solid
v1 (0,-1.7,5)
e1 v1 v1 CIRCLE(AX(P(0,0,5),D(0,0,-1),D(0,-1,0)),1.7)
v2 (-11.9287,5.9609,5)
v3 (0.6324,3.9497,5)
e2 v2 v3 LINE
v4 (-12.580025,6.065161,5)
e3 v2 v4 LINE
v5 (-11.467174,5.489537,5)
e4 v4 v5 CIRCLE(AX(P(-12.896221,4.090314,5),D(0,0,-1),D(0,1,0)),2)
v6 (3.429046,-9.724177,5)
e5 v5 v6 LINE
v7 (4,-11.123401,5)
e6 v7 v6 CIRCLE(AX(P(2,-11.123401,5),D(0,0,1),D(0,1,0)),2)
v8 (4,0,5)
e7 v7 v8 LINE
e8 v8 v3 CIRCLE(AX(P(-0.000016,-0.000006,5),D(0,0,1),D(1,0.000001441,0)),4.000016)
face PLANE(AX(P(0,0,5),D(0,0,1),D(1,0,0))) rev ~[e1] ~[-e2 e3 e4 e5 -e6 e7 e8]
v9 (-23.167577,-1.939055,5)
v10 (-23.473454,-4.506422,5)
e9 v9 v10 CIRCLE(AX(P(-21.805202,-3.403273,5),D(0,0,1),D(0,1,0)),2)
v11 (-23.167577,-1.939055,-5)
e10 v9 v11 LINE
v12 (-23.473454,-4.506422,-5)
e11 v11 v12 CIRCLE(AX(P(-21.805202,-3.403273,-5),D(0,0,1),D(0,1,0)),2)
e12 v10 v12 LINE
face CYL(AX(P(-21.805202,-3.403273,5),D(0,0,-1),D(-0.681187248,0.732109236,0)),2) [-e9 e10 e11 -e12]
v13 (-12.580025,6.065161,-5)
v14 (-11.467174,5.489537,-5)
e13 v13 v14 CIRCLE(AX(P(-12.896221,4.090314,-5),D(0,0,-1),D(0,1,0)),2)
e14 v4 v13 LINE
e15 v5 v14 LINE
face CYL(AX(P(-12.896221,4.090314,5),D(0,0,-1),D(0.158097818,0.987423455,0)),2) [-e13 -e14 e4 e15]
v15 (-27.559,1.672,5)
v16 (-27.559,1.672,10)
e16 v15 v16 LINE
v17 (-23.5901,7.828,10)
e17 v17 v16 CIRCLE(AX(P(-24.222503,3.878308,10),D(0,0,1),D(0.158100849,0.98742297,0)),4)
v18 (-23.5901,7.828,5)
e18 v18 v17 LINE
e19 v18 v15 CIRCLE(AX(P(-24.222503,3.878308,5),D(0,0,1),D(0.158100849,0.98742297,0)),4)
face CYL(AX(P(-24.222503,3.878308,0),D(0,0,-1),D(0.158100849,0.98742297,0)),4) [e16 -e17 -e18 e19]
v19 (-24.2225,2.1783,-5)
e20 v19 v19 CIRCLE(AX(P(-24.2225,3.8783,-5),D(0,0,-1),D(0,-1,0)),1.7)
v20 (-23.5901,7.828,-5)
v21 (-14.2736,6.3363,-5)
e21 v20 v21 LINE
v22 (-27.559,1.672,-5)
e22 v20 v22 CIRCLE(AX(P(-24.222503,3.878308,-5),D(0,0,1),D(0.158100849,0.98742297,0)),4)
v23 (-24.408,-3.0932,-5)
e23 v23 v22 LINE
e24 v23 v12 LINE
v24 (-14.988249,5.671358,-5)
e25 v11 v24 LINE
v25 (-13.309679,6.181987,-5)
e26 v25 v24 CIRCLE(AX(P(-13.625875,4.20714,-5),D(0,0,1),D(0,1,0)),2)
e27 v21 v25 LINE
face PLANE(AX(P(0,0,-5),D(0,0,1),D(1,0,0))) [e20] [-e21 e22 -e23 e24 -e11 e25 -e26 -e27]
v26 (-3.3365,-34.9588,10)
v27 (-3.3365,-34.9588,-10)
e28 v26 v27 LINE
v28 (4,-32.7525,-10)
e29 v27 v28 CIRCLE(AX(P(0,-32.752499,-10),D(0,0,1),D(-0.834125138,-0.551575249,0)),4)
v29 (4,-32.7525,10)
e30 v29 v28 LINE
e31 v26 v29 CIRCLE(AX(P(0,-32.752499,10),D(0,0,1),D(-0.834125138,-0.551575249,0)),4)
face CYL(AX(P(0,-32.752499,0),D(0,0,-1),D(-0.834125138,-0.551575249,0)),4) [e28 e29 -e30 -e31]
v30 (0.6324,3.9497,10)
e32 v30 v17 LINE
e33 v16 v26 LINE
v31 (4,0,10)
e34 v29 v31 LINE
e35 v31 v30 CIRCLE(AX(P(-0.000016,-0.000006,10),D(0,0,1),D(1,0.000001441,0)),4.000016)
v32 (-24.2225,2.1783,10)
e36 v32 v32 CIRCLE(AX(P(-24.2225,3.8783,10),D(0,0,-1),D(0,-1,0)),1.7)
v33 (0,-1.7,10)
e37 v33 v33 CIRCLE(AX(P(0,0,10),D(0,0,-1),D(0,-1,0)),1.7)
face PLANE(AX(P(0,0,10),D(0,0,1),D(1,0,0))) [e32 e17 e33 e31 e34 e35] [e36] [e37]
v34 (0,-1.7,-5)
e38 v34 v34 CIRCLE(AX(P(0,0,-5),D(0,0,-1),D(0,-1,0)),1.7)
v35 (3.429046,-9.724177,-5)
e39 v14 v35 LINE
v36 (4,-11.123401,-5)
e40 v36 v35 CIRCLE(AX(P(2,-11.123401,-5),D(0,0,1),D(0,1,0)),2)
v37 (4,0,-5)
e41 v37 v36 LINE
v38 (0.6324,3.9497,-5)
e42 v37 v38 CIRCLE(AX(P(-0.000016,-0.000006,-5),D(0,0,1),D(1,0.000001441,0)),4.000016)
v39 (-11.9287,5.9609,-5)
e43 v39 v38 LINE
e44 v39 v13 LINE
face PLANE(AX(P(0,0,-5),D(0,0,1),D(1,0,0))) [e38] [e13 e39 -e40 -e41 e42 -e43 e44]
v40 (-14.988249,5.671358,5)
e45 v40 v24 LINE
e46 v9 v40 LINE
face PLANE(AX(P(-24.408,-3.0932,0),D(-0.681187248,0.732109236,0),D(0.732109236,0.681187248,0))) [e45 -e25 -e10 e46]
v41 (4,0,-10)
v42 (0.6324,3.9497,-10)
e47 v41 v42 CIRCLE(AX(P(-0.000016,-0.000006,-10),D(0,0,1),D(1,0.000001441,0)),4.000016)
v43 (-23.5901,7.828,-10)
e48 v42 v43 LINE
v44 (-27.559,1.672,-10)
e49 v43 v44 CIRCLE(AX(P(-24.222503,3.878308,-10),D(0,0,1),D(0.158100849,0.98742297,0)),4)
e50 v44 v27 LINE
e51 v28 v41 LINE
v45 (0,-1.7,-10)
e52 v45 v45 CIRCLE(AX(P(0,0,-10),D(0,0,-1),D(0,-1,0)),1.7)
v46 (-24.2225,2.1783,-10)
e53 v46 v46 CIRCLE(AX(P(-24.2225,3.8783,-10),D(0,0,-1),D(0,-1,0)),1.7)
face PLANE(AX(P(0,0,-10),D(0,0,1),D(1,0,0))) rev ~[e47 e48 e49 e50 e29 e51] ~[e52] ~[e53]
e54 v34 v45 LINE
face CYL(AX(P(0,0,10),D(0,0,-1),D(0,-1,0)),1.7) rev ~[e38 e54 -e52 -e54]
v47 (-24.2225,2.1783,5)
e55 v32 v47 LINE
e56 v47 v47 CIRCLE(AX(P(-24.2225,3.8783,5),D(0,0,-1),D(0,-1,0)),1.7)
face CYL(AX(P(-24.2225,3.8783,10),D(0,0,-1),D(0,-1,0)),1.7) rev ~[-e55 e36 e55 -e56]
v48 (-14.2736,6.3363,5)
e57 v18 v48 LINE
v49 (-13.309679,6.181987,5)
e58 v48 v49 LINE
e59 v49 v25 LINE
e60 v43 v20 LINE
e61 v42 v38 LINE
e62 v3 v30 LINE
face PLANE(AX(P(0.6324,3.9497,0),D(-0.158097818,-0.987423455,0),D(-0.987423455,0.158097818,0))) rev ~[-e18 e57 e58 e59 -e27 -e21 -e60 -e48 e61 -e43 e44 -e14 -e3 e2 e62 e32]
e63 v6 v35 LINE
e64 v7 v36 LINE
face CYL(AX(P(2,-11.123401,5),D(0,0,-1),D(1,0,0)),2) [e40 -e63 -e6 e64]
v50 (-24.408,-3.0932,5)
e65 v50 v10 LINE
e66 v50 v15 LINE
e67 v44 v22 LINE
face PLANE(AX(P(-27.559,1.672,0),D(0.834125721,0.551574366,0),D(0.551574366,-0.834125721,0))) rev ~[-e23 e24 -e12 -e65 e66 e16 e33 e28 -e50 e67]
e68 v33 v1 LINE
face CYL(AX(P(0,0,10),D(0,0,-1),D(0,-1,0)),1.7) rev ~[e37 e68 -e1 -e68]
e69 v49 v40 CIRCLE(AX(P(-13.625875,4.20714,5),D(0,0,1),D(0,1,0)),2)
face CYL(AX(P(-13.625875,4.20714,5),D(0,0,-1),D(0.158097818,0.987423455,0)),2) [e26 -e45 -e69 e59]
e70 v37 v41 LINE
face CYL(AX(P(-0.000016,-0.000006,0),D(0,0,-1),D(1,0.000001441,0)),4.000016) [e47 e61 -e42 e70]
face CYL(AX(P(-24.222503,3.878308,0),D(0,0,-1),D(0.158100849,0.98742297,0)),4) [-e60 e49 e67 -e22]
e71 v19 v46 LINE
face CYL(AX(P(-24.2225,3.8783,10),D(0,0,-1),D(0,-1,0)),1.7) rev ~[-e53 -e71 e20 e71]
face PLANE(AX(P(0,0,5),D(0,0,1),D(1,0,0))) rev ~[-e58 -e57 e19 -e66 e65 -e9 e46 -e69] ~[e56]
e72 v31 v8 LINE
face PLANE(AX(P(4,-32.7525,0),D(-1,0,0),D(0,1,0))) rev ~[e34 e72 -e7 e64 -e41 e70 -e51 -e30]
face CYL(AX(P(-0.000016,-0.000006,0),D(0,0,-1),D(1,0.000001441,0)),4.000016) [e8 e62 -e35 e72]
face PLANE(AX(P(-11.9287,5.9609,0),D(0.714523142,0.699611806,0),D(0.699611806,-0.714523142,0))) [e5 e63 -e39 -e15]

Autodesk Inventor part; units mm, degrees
ref_plane "YZ Plane" through (0, 0, 0) normal (1, 0, 0) x (0, 1, 0)
ref_plane "XZ Plane" through (0, 0, 0) normal (0, 1, 0) x (-1, 0, 0)
ref_plane "XY Plane" through (0, 0, 0) normal (0, 0, 1) x (1, 0, 0)
sketch "Sketch1" plane through (0, 0, 0) normal (0, 0, 1) x (1, 0, 0)
  line L0 (0, 0) -> (-24.2225, 3.8783) construction
  line L1 (-24.2225, 3.8783) -> (0, -32.7525) construction
  line L2 (0, -32.7525) -> (0, 0) construction
  line L3 (0.6324, 3.9497) -> (-23.5901, 7.828)
  line L4 (-27.559, 1.672) -> (-3.3365, -34.9588)
  line L5 (4, -32.7525) -> (4, 0)
  arc A0 (-23.5901, 7.828) -> (-27.559, 1.672) centre (-24.2225, 3.8783) ccw
  arc A1 (4, 0) -> (0.6324, 3.9497) centre (0, 0) ccw
  arc A2 (-3.3365, -34.9588) -> (4, -32.7525) centre (0, -32.7525) ccw
  dimension "d0" = 32.7525
  dimension "d6" = 24.531
  dimension "d14" = 43.9153
  dimension "d15" = 4
extrude "Extrusion1" add sketch "Sketch1" along normal mid plane 20
sketch "Sketch2" plane through (0, 0, 0) normal (0, 0, 1) x (1, 0, 0)
  arc A0 (-23.5901, 7.828) -> (-27.559, 1.672) centre (-24.2225, 3.8783) ccw construction
  line L0 (-3.3365, -34.9588) -> (-27.559, 1.672) construction
  arc A1 (-3.3365, -34.9588) -> (4, -32.7525) centre (0, -32.7525) ccw construction
  line L1 (4, 0) -> (4, -32.7525) construction
  arc A2 (4, 0) -> (0.6324, 3.9497) centre (0, 0) ccw construction
  line L2 (-23.5901, 7.828) -> (0.6324, 3.9497) construction
  arc A3 (4, 0) -> (0.6324, 3.9497) centre (0, 0) ccw
  line L3 (4, 0) -> (4, -10.3073)
  arc A4 (-3.3365, -34.9588) -> (4, -32.7525) centre (0, -32.7525) ccw construction
  line L4 (-3.3365, -34.9588) -> (-7.3441, -28.8984) construction
  arc A5 (-23.5901, 7.828) -> (-27.559, 1.672) centre (-24.2225, 3.8783) ccw
  line L5 (-23.5901, 7.828) -> (-14.2736, 6.3363)
  line L6 (-24.408, -3.0932) -> (-14.2736, 6.3363)
  line L7 (-11.9287, 5.9609) -> (4, -10.3073)
  line L8 (-7.3441, -28.8984) -> (4, -26.0222) construction
  line L9 (-24.408, -3.0932) -> (-27.559, 1.672)
  line L10 (-7.3441, -28.8984) -> (-24.408, -3.0932) construction
  line L11 (4, -10.3073) -> (4, -26.0222) construction
  line L12 (4, -26.0222) -> (4, -32.7525) construction
  line L13 (-11.9287, 5.9609) -> (0.6324, 3.9497)
  line L14 (-14.2736, 6.3363) -> (-11.9287, 5.9609) construction
extrude "Extrusion2" cut sketch "Sketch2" along normal mid plane 10
fillet "Fillet1" radius 2 4 edges at (4, -10.3073, 0) (-11.9287, 5.9609, 0) (-24.408, -3.0932, 0) (-14.2736, 6.3363, 0)
sketch "Sketch3" plane through (0, 0, 10) normal (0, 0, 1) x (1, 0, 0)
  arc A0 (-23.5901, 7.828) -> (-27.559, 1.672) centre (-24.2225, 3.8783) ccw construction
  arc A1 (-3.3365, -34.9588) -> (4, -32.7525) centre (0, -32.7525) ccw construction
  arc A2 (4, 0) -> (0.6324, 3.9497) centre (0, 0) ccw construction
hole "Hole1" at (-24.2225, 3.8783, 10) at (0, 0, 10) direction (0, 0, -1) diameter 3.4 end through all clearance for "Socket Head Cap Screw" size "M3" standard "Ansi Metric M Profile"
equation "\"d0\" = LengthI"
equation "\"d6\" = LengthG"
equation "\"d14\" = LengthH"
equation "\"LengthI\" = 32.752538"
equation "\"LengthG\" = 24.531041"
equation "\"LengthH\" = 43.915254"
properties part number "GHI"
